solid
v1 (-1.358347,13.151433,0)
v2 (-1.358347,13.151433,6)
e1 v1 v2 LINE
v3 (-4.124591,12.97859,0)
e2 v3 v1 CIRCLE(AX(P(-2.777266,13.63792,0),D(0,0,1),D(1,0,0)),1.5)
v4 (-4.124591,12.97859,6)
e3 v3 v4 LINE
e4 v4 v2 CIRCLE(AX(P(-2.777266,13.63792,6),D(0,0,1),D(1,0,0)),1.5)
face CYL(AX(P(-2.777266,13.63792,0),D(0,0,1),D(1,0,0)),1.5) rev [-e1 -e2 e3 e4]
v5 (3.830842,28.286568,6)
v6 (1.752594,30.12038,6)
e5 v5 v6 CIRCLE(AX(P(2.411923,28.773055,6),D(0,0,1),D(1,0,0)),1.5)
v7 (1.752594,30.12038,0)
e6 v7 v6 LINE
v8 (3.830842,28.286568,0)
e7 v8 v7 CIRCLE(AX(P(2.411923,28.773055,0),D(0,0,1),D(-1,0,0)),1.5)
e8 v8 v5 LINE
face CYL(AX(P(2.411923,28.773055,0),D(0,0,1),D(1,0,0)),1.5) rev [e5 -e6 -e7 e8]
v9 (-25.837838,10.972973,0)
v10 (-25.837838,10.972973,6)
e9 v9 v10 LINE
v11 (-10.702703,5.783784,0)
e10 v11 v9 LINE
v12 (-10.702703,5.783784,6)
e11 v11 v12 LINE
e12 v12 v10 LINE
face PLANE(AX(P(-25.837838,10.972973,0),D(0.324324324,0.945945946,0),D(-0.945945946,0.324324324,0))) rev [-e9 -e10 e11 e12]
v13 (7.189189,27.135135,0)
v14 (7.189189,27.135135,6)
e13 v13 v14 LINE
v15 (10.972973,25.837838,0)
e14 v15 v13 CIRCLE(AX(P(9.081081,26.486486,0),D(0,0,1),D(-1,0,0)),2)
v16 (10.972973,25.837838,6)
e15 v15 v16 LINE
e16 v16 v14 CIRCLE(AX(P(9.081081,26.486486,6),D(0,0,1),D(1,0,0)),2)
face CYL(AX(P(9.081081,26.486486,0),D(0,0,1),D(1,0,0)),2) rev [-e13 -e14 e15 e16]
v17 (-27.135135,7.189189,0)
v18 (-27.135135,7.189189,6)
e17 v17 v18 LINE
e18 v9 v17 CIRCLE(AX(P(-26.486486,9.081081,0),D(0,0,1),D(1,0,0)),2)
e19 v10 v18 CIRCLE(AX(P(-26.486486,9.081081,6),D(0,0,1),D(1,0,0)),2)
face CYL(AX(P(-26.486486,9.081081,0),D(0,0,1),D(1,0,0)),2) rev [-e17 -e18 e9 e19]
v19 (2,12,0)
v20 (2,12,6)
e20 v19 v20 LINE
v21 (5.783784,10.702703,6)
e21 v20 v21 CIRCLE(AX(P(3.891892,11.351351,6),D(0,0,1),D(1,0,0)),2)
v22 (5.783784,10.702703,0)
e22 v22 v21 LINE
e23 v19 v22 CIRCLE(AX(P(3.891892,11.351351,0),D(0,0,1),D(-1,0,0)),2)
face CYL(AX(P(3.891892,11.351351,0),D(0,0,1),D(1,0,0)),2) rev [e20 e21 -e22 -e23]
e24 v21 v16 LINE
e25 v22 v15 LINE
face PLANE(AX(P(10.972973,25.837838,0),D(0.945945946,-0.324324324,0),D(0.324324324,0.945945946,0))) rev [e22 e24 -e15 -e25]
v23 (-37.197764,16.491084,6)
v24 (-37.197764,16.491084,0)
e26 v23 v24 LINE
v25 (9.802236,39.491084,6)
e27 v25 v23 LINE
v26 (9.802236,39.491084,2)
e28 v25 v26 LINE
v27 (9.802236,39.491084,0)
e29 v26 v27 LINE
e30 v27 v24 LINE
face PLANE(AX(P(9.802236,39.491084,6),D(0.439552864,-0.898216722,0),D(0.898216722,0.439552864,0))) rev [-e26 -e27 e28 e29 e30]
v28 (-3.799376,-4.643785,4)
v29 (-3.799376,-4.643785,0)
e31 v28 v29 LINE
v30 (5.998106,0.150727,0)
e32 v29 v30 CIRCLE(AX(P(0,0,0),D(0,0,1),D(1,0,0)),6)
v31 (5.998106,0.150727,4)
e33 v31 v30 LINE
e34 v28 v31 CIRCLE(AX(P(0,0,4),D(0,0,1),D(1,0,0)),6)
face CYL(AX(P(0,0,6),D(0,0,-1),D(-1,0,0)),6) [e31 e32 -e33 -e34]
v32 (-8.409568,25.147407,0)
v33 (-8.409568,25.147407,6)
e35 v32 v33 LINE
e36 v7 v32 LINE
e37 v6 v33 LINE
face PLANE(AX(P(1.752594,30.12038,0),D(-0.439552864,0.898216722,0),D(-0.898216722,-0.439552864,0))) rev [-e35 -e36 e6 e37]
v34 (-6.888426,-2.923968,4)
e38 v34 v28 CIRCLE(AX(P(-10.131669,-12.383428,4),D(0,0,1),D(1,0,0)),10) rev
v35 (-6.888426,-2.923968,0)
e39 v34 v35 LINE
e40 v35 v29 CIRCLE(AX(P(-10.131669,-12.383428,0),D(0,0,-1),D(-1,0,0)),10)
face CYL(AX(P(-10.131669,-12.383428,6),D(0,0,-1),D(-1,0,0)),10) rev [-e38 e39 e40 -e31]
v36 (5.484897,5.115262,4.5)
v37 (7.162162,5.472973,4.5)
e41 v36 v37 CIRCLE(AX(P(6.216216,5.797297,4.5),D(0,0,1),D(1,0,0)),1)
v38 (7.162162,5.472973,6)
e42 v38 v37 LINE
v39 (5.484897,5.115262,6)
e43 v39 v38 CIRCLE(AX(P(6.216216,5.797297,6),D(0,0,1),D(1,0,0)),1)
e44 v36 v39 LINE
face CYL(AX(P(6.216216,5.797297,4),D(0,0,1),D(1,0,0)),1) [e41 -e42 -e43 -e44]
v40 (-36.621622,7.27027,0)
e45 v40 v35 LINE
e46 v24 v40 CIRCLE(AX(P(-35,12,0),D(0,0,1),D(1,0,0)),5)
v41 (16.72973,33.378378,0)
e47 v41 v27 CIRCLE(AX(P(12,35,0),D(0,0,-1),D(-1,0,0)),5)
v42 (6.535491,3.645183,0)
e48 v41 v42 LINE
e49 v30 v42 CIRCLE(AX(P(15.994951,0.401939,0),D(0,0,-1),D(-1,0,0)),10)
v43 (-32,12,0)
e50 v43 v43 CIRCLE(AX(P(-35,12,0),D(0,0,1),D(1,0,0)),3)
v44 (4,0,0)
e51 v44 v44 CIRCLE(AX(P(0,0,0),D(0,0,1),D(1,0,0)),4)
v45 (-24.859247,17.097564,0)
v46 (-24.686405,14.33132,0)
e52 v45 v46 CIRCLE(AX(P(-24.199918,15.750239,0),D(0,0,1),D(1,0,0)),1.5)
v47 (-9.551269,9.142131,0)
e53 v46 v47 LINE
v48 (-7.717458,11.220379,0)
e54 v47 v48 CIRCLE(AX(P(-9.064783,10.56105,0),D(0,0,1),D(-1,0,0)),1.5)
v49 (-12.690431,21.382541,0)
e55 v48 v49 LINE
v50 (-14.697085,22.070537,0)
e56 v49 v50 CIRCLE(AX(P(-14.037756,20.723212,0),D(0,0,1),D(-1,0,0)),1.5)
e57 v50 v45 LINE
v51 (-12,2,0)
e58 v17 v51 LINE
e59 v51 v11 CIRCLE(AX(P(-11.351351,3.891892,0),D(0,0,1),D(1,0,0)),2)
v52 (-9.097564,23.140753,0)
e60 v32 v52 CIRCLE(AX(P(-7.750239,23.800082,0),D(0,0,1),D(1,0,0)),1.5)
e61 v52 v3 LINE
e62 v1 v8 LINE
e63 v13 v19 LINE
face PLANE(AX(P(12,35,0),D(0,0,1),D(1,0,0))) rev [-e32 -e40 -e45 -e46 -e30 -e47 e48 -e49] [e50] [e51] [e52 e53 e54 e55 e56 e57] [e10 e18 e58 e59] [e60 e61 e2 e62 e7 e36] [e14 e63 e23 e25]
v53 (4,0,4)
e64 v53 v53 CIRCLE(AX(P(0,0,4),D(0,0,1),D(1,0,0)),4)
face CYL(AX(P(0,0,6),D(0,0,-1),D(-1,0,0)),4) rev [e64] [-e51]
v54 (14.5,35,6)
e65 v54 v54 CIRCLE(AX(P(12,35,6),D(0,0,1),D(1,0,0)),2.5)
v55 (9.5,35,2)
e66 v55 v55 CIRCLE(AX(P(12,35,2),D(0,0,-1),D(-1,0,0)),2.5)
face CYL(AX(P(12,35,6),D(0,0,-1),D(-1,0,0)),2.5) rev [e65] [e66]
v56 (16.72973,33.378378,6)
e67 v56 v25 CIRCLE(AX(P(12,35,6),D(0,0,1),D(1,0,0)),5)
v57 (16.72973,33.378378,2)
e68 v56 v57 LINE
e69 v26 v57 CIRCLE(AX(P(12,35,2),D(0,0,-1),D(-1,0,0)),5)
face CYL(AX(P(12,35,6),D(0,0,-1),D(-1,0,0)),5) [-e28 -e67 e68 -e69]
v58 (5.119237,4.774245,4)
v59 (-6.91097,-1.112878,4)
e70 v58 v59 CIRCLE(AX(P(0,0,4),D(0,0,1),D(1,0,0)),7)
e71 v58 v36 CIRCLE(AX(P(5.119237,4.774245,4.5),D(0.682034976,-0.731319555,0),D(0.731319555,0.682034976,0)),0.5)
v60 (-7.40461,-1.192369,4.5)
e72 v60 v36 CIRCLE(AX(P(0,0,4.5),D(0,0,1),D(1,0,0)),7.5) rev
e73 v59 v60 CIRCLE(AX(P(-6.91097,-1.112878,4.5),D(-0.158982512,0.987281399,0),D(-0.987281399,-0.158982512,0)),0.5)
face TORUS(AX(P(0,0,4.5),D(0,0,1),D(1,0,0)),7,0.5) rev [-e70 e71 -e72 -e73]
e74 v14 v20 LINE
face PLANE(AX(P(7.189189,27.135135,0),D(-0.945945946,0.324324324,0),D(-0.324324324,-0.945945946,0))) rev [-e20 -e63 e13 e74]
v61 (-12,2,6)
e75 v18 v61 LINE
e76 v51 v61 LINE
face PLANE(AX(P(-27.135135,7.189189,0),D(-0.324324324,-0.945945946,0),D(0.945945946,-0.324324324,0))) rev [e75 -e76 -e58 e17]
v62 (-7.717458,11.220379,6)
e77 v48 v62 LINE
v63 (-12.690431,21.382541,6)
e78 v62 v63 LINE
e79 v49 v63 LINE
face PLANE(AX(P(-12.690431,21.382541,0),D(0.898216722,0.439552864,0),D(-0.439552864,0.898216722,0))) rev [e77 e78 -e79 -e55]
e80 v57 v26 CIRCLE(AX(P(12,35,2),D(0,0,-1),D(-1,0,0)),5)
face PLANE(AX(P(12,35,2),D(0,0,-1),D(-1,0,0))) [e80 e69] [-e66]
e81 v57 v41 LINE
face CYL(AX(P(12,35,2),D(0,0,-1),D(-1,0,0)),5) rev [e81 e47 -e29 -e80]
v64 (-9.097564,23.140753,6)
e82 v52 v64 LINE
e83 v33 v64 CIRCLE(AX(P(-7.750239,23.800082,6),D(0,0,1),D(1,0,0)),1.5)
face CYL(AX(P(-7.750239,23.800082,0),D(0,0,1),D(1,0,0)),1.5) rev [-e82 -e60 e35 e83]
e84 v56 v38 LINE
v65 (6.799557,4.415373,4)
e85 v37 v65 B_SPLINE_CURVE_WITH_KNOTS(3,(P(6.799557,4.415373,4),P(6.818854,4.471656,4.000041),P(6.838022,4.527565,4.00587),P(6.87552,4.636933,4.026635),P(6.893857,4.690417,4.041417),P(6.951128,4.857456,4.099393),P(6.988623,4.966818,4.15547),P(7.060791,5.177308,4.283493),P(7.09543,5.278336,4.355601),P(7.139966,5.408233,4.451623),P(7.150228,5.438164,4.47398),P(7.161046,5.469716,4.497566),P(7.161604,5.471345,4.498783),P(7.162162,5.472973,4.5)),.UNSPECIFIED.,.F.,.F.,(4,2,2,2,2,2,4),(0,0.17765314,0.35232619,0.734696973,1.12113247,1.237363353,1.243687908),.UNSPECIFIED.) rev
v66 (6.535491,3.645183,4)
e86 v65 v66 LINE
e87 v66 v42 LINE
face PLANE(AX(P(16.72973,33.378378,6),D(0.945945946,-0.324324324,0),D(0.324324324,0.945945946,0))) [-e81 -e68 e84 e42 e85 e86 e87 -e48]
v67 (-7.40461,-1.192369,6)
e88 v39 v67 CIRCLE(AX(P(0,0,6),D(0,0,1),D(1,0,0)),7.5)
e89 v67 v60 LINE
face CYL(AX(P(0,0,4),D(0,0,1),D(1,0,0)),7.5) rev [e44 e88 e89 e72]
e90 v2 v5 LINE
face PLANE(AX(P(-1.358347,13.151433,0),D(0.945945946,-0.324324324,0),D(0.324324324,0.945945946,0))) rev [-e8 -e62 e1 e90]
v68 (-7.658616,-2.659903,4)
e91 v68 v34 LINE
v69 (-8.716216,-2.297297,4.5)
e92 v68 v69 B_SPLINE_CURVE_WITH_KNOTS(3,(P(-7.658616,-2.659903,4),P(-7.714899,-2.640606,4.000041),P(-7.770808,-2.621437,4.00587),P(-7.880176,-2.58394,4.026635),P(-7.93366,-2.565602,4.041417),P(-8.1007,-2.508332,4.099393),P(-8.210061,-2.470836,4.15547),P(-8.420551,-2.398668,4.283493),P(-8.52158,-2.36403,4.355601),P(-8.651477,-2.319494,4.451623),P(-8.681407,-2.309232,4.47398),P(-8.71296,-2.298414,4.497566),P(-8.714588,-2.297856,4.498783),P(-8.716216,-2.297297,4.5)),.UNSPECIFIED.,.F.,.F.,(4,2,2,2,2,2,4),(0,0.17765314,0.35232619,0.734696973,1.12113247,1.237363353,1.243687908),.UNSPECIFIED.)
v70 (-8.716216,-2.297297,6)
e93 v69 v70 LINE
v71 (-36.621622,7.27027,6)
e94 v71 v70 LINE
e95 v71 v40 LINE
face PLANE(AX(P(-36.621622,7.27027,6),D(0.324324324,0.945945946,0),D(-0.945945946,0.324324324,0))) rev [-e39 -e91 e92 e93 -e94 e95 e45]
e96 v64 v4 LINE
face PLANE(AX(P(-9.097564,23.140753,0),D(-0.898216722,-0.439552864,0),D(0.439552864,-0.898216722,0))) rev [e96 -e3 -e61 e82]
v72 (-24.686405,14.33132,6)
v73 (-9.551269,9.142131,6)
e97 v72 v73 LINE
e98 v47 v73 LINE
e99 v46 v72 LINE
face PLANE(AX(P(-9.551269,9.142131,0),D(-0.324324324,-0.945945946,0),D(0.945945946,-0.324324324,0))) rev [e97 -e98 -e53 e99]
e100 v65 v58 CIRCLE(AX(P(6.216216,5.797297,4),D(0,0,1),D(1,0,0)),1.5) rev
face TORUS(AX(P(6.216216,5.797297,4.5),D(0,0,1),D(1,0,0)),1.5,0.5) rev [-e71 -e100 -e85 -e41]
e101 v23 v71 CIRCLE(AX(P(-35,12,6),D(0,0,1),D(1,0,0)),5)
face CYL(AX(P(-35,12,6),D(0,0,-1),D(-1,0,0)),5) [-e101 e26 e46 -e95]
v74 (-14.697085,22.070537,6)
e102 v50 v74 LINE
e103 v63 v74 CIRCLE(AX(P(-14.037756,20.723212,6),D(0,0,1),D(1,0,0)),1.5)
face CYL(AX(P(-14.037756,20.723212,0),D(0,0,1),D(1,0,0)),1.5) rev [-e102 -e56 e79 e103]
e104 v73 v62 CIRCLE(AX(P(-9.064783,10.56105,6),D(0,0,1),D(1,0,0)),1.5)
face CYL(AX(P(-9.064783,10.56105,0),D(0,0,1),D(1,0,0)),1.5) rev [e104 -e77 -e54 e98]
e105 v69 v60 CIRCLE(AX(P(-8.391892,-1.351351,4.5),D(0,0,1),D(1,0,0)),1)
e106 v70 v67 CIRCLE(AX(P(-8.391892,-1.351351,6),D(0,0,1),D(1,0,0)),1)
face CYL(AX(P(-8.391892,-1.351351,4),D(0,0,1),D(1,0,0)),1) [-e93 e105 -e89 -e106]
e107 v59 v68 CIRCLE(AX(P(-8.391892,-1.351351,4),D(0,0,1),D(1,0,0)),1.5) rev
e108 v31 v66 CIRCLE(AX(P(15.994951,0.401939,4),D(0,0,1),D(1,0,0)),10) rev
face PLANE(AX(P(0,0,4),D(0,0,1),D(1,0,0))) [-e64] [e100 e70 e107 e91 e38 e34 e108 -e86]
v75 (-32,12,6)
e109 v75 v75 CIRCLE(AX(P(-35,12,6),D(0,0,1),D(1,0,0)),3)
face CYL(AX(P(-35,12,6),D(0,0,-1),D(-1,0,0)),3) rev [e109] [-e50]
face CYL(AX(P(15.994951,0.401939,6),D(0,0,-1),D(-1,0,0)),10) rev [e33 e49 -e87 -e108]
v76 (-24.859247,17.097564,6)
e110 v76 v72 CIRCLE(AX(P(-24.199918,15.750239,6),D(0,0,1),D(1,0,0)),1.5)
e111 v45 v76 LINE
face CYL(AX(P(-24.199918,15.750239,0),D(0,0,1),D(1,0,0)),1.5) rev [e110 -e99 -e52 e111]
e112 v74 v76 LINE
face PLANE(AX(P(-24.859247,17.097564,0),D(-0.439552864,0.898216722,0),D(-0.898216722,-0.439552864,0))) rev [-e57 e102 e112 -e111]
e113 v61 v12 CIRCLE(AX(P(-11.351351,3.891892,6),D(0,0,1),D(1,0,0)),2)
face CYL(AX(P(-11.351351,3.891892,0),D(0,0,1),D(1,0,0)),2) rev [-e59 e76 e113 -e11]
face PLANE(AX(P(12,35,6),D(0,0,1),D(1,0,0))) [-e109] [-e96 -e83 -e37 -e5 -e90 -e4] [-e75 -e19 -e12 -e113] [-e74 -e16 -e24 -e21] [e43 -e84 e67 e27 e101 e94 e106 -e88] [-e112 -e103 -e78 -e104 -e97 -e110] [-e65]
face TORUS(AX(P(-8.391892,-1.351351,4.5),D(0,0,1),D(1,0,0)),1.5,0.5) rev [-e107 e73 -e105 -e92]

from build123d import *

# Parameters (mm, degrees)
SKETCH1_R               = 3
SKETCH1_R_2             = 4
SKETCH1_R_3             = 2.5
BOSS_EXTRUDE1_DEPTH     = 6
CUT_EXTRUDE1_DEPTH      = 57.885850613
CUT_EXTRUDE1_DEPTH_BACK = 57.885850613
SKETCH4_R               = 7.5
CUT_EXTRUDE2_DEPTH      = 2
FILLET1_R               = 1
FILLET2_R               = 0.5
SKETCH5_R               = 5
CUT_EXTRUDE4_DEPTH      = 2


with BuildPart() as part:
    # Sketch1 → Boss-Extrude1 (new body)
    with BuildSketch(Plane.XY):
        with BuildLine():
            Line((16.72972973, 33.378378378), (6.535491145, 3.645182505))
            ThreePointArc((6.535491145, 3.645182505), (6.111138498, 1.921892634), (5.998106477, 0.150727223))
            ThreePointArc((5.998106477, 0.150727223), (2.637317184, -5.389300332), (-3.799375872, -4.643785415))
            ThreePointArc((-3.799375872, -4.643785415), (-5.267291655, -3.646275313), (-6.888425749, -2.923968315))
            Line((-6.888425749, -2.923968315), (-36.621621622, 7.27027027))
            ThreePointArc((-36.621621622, 7.27027027), (-39.99026822, 11.688193819), (-37.19776432, 16.49108361))
            Line((-37.19776432, 16.49108361), (9.80223568, 39.49108361))
            ThreePointArc((9.80223568, 39.49108361), (15.308172233, 38.749132763), (16.72972973, 33.378378378))
        make_face()
        with Locations((-35, 12)):
            Circle(SKETCH1_R, mode=Mode.SUBTRACT)
        Circle(SKETCH1_R_2, mode=Mode.SUBTRACT)
        with Locations((12, 35)):
            Circle(SKETCH1_R_3, mode=Mode.SUBTRACT)
    extrude(amount=BOSS_EXTRUDE1_DEPTH)

    # Sketch2 → Cut-Extrude1 (cut, two sides: drawn at the far end of the back side and taken through both)
    with BuildSketch(Plane.XY.offset(6).offset(-CUT_EXTRUDE1_DEPTH_BACK)):
        with BuildLine():
            Line((-24.859247394, 17.097563964), (-14.697085232, 22.070536937))
            ThreePointArc((-14.697085232, 22.070536937), (-13.551269449, 22.142130773), (-12.690430853, 21.38254115))
            Line((-12.690430853, 21.38254115), (-7.71745788, 11.220378988))
            ThreePointArc((-7.71745788, 11.220378988), (-7.940043134, 9.568598022), (-9.551269449, 9.142130773))
            Line((-9.551269449, 9.142130773), (-24.686404584, 14.331319962))
            ThreePointArc((-24.686404584, 14.331319962), (-25.696998564, 15.656697027), (-24.859247394, 17.097563964))
        make_face()
        with BuildLine():
            Line((-25.837837838, 10.972972973), (-10.702702703, 5.783783784))
            ThreePointArc((-10.702702703, 5.783783784), (-9.459459459, 3.243243243), (-12, 2))
            Line((-12, 2), (-27.135135135, 7.189189189))
            ThreePointArc((-27.135135135, 7.189189189), (-28.378378378, 9.72972973), (-25.837837838, 10.972972973))
        make_face()
        with BuildLine():
            Line((-9.097563964, 23.140752606), (-4.124590991, 12.978590444))
            ThreePointArc((-4.124590991, 12.978590444), (-2.683724054, 12.140839274), (-1.358346989, 13.151433254))
            Line((-1.358346989, 13.151433254), (3.8308422, 28.286568389))
            ThreePointArc((3.8308422, 28.286568389), (3.404374951, 29.897794704), (1.752593985, 30.120379958))
            Line((1.752593985, 30.120379958), (-8.409568177, 25.147406985))
            ThreePointArc((-8.409568177, 25.147406985), (-9.1691578, 24.286568389), (-9.097563964, 23.140752606))
        make_face()
        with BuildLine():
            Line((7.189189189, 27.135135135), (2, 12))
            ThreePointArc((2, 12), (3.243243243, 9.459459459), (5.783783784, 10.702702703))
            Line((5.783783784, 10.702702703), (10.972972973, 25.837837838))
            ThreePointArc((10.972972973, 25.837837838), (9.72972973, 28.378378378), (7.189189189, 27.135135135))
        make_face()
    extrude(amount=CUT_EXTRUDE1_DEPTH + CUT_EXTRUDE1_DEPTH_BACK, mode=Mode.SUBTRACT)

    # Sketch4 → Cut-Extrude2 (cut)
    with BuildSketch(Plane.XY.offset(6)):
        Circle(SKETCH4_R)
    extrude(amount=-CUT_EXTRUDE2_DEPTH, mode=Mode.SUBTRACT)

    # Fillet1
    fillet1_edges = [part.edges().sort_by_distance(p)[0] for p in [
        (6.54275782, 3.666376974, 5),
        (-6.909620217, -2.91670164, 5),
    ]]
    fillet(fillet1_edges, radius=FILLET1_R)

    # Fillet2
    # the kernel refuses this fillet: 0.5 mm, written as the material it adds along each edge
    with BuildSketch(Plane(origin=(0, 0, 4), x_dir=(0.7313195548489669, 0.6820349761526229, 0), z_dir=(0.6820349761526229, -0.7313195548489669, 0))) as fillet2_piece_1:
        with BuildLine():
            CenterArc((7.5 - FILLET2_R, FILLET2_R), FILLET2_R, 270, 90)
            Line((7.5 - FILLET2_R, 0), (7.5, 0))
            Line((7.5, 0), (7.5, FILLET2_R))
        make_face()
    revolve(axis=Axis((0, 0, 4), (0, 0, 1)), revolution_arc=146.144973872)
    with BuildSketch(Plane(origin=(6.216216216, 5.797297297, 4), x_dir=(0.6053689071166585, 0.7959450271823945, 0), z_dir=(-0.7959450271823945, 0.6053689071166585, 0))) as fillet2_piece_2_section:
        with BuildLine():
            CenterArc((1 + FILLET2_R, -FILLET2_R), FILLET2_R, 90, 90)
            Line((1, -FILLET2_R), (1, 0))
            Line((1, 0), (1 + FILLET2_R, 0))
        make_face()
    fillet2_piece_2 = revolve(axis=Axis((6.216216216, 5.797297297, 4), (0, 0, -1)), revolution_arc=189.741738526, mode=Mode.PRIVATE)
    fillet2_piece_2 = split(fillet2_piece_2, bisect_by=Plane(origin=(6.878990216, 4.647054795, 4.123474389), z_dir=(-0.945945945945946, 0.32432432432432406, 0)), keep=Keep.TOP, mode=Mode.PRIVATE)
    add(fillet2_piece_2)
    with BuildSketch(Plane(origin=(-8.391891892, -1.351351351, 4), x_dir=(0.9872813990461049, 0.1589825119236894, 0), z_dir=(-0.1589825119236894, 0.9872813990461049, 0))) as fillet2_piece_3_section:
        with BuildLine():
            CenterArc((1 + FILLET2_R, -FILLET2_R), FILLET2_R, 90, 90)
            Line((1 + FILLET2_R, 0), (1, 0))
            Line((1, 0), (1, -FILLET2_R))
        make_face()
    fillet2_piece_3 = revolve(axis=Axis((-8.391891892, -1.351351351, 4), (0, 0, -1)), revolution_arc=189.741738526, mode=Mode.PRIVATE)
    fillet2_piece_3 = split(fillet2_piece_3, bisect_by=Plane(origin=(-7.890298213, -2.580469184, 4.123474408), z_dir=(0.3243243243243243, 0.9459459459459462, 0)), keep=Keep.TOP, mode=Mode.PRIVATE)
    add(fillet2_piece_3)

    # Sketch5 → Cut-Extrude4 (cut)
    with BuildSketch(Plane(origin=(0, 0, 0), x_dir=(-1, 0, 0), z_dir=(0, 0, -1))):
        with Locations((-12, 35)):
            Circle(SKETCH5_R)
    extrude(amount=-CUT_EXTRUDE4_DEPTH, mode=Mode.SUBTRACT)


solid = part.part
